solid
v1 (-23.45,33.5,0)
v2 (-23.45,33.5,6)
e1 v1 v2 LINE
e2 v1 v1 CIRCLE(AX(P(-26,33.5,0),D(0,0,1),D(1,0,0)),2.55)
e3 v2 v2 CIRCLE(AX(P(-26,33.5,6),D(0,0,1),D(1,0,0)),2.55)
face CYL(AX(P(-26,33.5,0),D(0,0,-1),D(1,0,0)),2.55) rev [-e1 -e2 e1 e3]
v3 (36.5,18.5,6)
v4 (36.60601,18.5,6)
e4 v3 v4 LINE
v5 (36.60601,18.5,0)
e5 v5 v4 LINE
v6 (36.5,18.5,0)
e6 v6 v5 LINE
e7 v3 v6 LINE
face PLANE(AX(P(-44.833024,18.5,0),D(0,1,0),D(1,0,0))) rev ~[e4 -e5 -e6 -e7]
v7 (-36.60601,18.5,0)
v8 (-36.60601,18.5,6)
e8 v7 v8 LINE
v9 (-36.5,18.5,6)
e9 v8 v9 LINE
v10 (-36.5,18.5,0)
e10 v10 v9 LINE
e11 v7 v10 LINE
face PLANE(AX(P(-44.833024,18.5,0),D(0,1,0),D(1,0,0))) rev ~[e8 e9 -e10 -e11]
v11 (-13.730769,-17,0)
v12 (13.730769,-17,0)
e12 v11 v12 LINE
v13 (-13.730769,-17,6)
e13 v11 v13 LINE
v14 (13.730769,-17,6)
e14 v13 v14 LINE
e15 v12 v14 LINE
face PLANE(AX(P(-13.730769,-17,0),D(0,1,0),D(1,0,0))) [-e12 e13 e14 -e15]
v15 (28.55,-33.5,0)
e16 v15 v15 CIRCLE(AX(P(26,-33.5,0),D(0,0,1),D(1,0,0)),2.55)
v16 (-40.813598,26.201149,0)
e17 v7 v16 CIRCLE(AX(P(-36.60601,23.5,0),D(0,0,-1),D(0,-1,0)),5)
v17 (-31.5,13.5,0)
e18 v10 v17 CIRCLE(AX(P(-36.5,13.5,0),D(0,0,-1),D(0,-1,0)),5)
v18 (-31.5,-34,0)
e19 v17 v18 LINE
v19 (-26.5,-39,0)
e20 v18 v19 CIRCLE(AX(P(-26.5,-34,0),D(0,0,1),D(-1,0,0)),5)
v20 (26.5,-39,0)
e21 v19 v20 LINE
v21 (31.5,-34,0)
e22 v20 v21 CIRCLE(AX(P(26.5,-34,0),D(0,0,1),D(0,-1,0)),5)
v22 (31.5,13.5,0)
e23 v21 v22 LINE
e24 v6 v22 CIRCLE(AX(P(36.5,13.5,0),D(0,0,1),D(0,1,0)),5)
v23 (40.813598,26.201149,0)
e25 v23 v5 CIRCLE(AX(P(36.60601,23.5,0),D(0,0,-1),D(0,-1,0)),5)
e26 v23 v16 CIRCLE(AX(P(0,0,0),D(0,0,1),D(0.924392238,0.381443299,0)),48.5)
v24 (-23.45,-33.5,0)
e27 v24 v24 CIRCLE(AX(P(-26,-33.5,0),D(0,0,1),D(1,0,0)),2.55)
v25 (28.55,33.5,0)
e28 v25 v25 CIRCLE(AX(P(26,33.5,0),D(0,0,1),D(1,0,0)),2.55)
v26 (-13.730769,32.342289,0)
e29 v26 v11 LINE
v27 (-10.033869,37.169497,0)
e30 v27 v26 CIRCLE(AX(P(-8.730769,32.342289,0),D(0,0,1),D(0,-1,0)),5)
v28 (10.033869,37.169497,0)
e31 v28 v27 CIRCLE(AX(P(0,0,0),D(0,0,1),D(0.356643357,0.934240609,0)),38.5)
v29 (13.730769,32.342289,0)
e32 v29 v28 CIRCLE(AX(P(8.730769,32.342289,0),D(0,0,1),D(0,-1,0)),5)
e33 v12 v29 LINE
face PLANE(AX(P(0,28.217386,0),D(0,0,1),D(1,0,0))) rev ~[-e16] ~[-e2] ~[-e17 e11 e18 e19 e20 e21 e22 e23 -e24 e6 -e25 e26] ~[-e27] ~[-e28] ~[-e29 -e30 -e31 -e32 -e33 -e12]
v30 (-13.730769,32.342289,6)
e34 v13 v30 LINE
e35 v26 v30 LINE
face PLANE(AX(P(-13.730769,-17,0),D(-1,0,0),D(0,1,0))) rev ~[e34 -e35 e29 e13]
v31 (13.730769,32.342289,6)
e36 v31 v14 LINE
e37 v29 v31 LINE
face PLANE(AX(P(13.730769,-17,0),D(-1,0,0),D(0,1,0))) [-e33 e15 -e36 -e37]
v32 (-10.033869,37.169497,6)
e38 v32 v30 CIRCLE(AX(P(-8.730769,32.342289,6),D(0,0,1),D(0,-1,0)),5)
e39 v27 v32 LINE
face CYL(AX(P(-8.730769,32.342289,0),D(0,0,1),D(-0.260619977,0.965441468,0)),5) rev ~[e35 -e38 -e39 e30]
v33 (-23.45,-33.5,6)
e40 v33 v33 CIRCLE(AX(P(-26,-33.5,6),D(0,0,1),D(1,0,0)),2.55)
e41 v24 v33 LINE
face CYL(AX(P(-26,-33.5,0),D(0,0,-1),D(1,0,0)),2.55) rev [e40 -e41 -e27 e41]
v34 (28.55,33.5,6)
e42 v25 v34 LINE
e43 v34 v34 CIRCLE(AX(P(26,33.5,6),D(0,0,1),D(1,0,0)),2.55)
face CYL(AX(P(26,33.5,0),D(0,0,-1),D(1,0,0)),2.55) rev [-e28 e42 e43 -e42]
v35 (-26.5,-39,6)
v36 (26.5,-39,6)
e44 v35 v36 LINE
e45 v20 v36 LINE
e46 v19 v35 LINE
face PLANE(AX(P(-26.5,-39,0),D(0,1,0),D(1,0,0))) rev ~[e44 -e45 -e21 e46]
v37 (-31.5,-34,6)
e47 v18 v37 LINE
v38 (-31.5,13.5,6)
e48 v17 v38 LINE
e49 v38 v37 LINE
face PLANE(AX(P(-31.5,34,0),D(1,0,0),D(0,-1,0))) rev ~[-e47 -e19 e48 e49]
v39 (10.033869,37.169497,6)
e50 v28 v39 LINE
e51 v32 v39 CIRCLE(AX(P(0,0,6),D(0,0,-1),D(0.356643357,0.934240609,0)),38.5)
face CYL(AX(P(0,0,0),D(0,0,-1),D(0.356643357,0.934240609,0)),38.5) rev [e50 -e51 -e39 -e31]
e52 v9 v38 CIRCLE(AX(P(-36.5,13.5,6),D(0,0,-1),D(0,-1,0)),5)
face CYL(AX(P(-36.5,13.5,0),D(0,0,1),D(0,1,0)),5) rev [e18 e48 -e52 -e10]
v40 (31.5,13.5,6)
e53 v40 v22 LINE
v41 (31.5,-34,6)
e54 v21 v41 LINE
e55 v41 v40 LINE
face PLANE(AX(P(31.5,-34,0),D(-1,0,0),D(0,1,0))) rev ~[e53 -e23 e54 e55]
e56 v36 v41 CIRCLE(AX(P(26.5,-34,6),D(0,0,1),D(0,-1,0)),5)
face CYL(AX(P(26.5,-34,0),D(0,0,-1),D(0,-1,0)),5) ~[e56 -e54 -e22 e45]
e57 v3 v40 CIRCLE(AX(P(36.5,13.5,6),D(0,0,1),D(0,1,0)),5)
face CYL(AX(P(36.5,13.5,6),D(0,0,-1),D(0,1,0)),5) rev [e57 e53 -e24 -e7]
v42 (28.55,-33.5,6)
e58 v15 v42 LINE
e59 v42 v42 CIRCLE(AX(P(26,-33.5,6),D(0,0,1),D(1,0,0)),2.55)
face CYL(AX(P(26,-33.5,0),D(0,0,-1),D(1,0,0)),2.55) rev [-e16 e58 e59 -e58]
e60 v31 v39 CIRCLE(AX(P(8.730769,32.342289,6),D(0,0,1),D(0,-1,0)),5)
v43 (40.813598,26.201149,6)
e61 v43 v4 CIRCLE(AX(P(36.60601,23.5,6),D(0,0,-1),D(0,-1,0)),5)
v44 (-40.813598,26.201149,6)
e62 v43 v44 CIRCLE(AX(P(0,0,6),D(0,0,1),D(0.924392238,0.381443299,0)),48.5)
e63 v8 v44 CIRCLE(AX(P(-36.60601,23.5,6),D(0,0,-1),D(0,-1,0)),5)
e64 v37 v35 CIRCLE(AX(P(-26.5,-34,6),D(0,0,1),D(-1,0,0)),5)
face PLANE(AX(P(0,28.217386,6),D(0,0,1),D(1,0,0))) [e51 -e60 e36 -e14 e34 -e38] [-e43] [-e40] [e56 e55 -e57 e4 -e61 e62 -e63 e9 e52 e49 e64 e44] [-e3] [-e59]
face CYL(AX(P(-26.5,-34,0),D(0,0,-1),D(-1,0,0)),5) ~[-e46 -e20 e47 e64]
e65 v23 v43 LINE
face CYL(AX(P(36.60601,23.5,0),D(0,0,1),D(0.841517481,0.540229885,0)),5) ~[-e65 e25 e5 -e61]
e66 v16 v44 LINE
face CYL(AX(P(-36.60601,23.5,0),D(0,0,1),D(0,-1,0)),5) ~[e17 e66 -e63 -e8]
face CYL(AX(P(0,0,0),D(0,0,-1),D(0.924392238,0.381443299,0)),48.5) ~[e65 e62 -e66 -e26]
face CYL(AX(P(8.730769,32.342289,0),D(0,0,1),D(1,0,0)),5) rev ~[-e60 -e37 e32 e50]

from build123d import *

# Parameters (mm, degrees)
F0_R     = 2.55
F0_W     = 27.4615384615
F0_H     = 34
F1_DEPTH = 6
F2_R     = 2.55
F3_DEPTH = 6
F5_DEPTH = 6.001
F6_R     = 5


with BuildPart() as f1:
    # F0 (on Top) → F1 (new body)
    with BuildSketch(Plane.XY):
        with BuildLine():
            Line((26.5, 39), (-26.5, 39))
            ThreePointArc((-26.5, 39), (-30.0355339059, 37.5355339059), (-31.5, 34))
            Line((-31.5, 34), (-31.5, -34))
            ThreePointArc((-31.5, -34), (-30.0355339059, -37.5355339059), (-26.5, -39))
            Line((-26.5, -39), (26.5, -39))
            ThreePointArc((26.5, -39), (30.0355339059, -37.5355339059), (31.5, -34))
            Line((31.5, -34), (31.5, 34))
            ThreePointArc((31.5, 34), (30.0355339059, 37.5355339059), (26.5, 39))
        make_face()
        with Locations((-26, -33.5)):
            Circle(F0_R, mode=Mode.SUBTRACT)
        with Locations((26, -33.5)):
            Circle(F0_R, mode=Mode.SUBTRACT)
        Rectangle(F0_W, F0_H, mode=Mode.SUBTRACT)
        with Locations((-26, 33.5)):
            Circle(F0_R, mode=Mode.SUBTRACT)
        with Locations((26, 33.5)):
            Circle(F0_R, mode=Mode.SUBTRACT)
    extrude(amount=F1_DEPTH)

    # F2 (on Top) → F3 (join, through all)
    with BuildSketch(Plane.XY):
        with BuildLine():
            Line((-44.8330235429, 18.5), (44.8330235429, 18.5))
            ThreePointArc((44.8330235429, 18.5), (0, 48.5), (-44.8330235429, 18.5))
        make_face()
        with Locations((-26, 33.5)):
            Circle(F2_R, mode=Mode.SUBTRACT)
        with Locations((26, 33.5)):
            Circle(F2_R, mode=Mode.SUBTRACT)
    extrude(amount=F3_DEPTH)

    # F4 (on Top) → F5 (cut, through all)
    with BuildSketch(Plane.XY):
        with BuildLine():
            Line((13.7307692308, 17), (13.7307692308, 35.96826346))
            ThreePointArc((13.7307692308, 35.96826346), (0, 38.5), (-13.7307692308, 35.96826346))
            Line((-13.7307692308, 35.96826346), (-13.7307692308, 17))
            Line((-13.7307692308, 17), (13.7307692308, 17))
        make_face()
    extrude(amount=F5_DEPTH, mode=Mode.SUBTRACT)

    # F6
    f6_edges = [f1.edges().sort_by_distance(p)[0] for p in [
        (44.833024, 18.5, 3),
        (-31.5, 18.5, 3),
        (31.5, 18.5, 3),
        (13.730769, 35.968263, 3),
        (-13.730769, 35.968263, 3),
        (-44.833024, 18.5, 3),
    ]]
    fillet(f6_edges, radius=F6_R)


solid = f1.part
